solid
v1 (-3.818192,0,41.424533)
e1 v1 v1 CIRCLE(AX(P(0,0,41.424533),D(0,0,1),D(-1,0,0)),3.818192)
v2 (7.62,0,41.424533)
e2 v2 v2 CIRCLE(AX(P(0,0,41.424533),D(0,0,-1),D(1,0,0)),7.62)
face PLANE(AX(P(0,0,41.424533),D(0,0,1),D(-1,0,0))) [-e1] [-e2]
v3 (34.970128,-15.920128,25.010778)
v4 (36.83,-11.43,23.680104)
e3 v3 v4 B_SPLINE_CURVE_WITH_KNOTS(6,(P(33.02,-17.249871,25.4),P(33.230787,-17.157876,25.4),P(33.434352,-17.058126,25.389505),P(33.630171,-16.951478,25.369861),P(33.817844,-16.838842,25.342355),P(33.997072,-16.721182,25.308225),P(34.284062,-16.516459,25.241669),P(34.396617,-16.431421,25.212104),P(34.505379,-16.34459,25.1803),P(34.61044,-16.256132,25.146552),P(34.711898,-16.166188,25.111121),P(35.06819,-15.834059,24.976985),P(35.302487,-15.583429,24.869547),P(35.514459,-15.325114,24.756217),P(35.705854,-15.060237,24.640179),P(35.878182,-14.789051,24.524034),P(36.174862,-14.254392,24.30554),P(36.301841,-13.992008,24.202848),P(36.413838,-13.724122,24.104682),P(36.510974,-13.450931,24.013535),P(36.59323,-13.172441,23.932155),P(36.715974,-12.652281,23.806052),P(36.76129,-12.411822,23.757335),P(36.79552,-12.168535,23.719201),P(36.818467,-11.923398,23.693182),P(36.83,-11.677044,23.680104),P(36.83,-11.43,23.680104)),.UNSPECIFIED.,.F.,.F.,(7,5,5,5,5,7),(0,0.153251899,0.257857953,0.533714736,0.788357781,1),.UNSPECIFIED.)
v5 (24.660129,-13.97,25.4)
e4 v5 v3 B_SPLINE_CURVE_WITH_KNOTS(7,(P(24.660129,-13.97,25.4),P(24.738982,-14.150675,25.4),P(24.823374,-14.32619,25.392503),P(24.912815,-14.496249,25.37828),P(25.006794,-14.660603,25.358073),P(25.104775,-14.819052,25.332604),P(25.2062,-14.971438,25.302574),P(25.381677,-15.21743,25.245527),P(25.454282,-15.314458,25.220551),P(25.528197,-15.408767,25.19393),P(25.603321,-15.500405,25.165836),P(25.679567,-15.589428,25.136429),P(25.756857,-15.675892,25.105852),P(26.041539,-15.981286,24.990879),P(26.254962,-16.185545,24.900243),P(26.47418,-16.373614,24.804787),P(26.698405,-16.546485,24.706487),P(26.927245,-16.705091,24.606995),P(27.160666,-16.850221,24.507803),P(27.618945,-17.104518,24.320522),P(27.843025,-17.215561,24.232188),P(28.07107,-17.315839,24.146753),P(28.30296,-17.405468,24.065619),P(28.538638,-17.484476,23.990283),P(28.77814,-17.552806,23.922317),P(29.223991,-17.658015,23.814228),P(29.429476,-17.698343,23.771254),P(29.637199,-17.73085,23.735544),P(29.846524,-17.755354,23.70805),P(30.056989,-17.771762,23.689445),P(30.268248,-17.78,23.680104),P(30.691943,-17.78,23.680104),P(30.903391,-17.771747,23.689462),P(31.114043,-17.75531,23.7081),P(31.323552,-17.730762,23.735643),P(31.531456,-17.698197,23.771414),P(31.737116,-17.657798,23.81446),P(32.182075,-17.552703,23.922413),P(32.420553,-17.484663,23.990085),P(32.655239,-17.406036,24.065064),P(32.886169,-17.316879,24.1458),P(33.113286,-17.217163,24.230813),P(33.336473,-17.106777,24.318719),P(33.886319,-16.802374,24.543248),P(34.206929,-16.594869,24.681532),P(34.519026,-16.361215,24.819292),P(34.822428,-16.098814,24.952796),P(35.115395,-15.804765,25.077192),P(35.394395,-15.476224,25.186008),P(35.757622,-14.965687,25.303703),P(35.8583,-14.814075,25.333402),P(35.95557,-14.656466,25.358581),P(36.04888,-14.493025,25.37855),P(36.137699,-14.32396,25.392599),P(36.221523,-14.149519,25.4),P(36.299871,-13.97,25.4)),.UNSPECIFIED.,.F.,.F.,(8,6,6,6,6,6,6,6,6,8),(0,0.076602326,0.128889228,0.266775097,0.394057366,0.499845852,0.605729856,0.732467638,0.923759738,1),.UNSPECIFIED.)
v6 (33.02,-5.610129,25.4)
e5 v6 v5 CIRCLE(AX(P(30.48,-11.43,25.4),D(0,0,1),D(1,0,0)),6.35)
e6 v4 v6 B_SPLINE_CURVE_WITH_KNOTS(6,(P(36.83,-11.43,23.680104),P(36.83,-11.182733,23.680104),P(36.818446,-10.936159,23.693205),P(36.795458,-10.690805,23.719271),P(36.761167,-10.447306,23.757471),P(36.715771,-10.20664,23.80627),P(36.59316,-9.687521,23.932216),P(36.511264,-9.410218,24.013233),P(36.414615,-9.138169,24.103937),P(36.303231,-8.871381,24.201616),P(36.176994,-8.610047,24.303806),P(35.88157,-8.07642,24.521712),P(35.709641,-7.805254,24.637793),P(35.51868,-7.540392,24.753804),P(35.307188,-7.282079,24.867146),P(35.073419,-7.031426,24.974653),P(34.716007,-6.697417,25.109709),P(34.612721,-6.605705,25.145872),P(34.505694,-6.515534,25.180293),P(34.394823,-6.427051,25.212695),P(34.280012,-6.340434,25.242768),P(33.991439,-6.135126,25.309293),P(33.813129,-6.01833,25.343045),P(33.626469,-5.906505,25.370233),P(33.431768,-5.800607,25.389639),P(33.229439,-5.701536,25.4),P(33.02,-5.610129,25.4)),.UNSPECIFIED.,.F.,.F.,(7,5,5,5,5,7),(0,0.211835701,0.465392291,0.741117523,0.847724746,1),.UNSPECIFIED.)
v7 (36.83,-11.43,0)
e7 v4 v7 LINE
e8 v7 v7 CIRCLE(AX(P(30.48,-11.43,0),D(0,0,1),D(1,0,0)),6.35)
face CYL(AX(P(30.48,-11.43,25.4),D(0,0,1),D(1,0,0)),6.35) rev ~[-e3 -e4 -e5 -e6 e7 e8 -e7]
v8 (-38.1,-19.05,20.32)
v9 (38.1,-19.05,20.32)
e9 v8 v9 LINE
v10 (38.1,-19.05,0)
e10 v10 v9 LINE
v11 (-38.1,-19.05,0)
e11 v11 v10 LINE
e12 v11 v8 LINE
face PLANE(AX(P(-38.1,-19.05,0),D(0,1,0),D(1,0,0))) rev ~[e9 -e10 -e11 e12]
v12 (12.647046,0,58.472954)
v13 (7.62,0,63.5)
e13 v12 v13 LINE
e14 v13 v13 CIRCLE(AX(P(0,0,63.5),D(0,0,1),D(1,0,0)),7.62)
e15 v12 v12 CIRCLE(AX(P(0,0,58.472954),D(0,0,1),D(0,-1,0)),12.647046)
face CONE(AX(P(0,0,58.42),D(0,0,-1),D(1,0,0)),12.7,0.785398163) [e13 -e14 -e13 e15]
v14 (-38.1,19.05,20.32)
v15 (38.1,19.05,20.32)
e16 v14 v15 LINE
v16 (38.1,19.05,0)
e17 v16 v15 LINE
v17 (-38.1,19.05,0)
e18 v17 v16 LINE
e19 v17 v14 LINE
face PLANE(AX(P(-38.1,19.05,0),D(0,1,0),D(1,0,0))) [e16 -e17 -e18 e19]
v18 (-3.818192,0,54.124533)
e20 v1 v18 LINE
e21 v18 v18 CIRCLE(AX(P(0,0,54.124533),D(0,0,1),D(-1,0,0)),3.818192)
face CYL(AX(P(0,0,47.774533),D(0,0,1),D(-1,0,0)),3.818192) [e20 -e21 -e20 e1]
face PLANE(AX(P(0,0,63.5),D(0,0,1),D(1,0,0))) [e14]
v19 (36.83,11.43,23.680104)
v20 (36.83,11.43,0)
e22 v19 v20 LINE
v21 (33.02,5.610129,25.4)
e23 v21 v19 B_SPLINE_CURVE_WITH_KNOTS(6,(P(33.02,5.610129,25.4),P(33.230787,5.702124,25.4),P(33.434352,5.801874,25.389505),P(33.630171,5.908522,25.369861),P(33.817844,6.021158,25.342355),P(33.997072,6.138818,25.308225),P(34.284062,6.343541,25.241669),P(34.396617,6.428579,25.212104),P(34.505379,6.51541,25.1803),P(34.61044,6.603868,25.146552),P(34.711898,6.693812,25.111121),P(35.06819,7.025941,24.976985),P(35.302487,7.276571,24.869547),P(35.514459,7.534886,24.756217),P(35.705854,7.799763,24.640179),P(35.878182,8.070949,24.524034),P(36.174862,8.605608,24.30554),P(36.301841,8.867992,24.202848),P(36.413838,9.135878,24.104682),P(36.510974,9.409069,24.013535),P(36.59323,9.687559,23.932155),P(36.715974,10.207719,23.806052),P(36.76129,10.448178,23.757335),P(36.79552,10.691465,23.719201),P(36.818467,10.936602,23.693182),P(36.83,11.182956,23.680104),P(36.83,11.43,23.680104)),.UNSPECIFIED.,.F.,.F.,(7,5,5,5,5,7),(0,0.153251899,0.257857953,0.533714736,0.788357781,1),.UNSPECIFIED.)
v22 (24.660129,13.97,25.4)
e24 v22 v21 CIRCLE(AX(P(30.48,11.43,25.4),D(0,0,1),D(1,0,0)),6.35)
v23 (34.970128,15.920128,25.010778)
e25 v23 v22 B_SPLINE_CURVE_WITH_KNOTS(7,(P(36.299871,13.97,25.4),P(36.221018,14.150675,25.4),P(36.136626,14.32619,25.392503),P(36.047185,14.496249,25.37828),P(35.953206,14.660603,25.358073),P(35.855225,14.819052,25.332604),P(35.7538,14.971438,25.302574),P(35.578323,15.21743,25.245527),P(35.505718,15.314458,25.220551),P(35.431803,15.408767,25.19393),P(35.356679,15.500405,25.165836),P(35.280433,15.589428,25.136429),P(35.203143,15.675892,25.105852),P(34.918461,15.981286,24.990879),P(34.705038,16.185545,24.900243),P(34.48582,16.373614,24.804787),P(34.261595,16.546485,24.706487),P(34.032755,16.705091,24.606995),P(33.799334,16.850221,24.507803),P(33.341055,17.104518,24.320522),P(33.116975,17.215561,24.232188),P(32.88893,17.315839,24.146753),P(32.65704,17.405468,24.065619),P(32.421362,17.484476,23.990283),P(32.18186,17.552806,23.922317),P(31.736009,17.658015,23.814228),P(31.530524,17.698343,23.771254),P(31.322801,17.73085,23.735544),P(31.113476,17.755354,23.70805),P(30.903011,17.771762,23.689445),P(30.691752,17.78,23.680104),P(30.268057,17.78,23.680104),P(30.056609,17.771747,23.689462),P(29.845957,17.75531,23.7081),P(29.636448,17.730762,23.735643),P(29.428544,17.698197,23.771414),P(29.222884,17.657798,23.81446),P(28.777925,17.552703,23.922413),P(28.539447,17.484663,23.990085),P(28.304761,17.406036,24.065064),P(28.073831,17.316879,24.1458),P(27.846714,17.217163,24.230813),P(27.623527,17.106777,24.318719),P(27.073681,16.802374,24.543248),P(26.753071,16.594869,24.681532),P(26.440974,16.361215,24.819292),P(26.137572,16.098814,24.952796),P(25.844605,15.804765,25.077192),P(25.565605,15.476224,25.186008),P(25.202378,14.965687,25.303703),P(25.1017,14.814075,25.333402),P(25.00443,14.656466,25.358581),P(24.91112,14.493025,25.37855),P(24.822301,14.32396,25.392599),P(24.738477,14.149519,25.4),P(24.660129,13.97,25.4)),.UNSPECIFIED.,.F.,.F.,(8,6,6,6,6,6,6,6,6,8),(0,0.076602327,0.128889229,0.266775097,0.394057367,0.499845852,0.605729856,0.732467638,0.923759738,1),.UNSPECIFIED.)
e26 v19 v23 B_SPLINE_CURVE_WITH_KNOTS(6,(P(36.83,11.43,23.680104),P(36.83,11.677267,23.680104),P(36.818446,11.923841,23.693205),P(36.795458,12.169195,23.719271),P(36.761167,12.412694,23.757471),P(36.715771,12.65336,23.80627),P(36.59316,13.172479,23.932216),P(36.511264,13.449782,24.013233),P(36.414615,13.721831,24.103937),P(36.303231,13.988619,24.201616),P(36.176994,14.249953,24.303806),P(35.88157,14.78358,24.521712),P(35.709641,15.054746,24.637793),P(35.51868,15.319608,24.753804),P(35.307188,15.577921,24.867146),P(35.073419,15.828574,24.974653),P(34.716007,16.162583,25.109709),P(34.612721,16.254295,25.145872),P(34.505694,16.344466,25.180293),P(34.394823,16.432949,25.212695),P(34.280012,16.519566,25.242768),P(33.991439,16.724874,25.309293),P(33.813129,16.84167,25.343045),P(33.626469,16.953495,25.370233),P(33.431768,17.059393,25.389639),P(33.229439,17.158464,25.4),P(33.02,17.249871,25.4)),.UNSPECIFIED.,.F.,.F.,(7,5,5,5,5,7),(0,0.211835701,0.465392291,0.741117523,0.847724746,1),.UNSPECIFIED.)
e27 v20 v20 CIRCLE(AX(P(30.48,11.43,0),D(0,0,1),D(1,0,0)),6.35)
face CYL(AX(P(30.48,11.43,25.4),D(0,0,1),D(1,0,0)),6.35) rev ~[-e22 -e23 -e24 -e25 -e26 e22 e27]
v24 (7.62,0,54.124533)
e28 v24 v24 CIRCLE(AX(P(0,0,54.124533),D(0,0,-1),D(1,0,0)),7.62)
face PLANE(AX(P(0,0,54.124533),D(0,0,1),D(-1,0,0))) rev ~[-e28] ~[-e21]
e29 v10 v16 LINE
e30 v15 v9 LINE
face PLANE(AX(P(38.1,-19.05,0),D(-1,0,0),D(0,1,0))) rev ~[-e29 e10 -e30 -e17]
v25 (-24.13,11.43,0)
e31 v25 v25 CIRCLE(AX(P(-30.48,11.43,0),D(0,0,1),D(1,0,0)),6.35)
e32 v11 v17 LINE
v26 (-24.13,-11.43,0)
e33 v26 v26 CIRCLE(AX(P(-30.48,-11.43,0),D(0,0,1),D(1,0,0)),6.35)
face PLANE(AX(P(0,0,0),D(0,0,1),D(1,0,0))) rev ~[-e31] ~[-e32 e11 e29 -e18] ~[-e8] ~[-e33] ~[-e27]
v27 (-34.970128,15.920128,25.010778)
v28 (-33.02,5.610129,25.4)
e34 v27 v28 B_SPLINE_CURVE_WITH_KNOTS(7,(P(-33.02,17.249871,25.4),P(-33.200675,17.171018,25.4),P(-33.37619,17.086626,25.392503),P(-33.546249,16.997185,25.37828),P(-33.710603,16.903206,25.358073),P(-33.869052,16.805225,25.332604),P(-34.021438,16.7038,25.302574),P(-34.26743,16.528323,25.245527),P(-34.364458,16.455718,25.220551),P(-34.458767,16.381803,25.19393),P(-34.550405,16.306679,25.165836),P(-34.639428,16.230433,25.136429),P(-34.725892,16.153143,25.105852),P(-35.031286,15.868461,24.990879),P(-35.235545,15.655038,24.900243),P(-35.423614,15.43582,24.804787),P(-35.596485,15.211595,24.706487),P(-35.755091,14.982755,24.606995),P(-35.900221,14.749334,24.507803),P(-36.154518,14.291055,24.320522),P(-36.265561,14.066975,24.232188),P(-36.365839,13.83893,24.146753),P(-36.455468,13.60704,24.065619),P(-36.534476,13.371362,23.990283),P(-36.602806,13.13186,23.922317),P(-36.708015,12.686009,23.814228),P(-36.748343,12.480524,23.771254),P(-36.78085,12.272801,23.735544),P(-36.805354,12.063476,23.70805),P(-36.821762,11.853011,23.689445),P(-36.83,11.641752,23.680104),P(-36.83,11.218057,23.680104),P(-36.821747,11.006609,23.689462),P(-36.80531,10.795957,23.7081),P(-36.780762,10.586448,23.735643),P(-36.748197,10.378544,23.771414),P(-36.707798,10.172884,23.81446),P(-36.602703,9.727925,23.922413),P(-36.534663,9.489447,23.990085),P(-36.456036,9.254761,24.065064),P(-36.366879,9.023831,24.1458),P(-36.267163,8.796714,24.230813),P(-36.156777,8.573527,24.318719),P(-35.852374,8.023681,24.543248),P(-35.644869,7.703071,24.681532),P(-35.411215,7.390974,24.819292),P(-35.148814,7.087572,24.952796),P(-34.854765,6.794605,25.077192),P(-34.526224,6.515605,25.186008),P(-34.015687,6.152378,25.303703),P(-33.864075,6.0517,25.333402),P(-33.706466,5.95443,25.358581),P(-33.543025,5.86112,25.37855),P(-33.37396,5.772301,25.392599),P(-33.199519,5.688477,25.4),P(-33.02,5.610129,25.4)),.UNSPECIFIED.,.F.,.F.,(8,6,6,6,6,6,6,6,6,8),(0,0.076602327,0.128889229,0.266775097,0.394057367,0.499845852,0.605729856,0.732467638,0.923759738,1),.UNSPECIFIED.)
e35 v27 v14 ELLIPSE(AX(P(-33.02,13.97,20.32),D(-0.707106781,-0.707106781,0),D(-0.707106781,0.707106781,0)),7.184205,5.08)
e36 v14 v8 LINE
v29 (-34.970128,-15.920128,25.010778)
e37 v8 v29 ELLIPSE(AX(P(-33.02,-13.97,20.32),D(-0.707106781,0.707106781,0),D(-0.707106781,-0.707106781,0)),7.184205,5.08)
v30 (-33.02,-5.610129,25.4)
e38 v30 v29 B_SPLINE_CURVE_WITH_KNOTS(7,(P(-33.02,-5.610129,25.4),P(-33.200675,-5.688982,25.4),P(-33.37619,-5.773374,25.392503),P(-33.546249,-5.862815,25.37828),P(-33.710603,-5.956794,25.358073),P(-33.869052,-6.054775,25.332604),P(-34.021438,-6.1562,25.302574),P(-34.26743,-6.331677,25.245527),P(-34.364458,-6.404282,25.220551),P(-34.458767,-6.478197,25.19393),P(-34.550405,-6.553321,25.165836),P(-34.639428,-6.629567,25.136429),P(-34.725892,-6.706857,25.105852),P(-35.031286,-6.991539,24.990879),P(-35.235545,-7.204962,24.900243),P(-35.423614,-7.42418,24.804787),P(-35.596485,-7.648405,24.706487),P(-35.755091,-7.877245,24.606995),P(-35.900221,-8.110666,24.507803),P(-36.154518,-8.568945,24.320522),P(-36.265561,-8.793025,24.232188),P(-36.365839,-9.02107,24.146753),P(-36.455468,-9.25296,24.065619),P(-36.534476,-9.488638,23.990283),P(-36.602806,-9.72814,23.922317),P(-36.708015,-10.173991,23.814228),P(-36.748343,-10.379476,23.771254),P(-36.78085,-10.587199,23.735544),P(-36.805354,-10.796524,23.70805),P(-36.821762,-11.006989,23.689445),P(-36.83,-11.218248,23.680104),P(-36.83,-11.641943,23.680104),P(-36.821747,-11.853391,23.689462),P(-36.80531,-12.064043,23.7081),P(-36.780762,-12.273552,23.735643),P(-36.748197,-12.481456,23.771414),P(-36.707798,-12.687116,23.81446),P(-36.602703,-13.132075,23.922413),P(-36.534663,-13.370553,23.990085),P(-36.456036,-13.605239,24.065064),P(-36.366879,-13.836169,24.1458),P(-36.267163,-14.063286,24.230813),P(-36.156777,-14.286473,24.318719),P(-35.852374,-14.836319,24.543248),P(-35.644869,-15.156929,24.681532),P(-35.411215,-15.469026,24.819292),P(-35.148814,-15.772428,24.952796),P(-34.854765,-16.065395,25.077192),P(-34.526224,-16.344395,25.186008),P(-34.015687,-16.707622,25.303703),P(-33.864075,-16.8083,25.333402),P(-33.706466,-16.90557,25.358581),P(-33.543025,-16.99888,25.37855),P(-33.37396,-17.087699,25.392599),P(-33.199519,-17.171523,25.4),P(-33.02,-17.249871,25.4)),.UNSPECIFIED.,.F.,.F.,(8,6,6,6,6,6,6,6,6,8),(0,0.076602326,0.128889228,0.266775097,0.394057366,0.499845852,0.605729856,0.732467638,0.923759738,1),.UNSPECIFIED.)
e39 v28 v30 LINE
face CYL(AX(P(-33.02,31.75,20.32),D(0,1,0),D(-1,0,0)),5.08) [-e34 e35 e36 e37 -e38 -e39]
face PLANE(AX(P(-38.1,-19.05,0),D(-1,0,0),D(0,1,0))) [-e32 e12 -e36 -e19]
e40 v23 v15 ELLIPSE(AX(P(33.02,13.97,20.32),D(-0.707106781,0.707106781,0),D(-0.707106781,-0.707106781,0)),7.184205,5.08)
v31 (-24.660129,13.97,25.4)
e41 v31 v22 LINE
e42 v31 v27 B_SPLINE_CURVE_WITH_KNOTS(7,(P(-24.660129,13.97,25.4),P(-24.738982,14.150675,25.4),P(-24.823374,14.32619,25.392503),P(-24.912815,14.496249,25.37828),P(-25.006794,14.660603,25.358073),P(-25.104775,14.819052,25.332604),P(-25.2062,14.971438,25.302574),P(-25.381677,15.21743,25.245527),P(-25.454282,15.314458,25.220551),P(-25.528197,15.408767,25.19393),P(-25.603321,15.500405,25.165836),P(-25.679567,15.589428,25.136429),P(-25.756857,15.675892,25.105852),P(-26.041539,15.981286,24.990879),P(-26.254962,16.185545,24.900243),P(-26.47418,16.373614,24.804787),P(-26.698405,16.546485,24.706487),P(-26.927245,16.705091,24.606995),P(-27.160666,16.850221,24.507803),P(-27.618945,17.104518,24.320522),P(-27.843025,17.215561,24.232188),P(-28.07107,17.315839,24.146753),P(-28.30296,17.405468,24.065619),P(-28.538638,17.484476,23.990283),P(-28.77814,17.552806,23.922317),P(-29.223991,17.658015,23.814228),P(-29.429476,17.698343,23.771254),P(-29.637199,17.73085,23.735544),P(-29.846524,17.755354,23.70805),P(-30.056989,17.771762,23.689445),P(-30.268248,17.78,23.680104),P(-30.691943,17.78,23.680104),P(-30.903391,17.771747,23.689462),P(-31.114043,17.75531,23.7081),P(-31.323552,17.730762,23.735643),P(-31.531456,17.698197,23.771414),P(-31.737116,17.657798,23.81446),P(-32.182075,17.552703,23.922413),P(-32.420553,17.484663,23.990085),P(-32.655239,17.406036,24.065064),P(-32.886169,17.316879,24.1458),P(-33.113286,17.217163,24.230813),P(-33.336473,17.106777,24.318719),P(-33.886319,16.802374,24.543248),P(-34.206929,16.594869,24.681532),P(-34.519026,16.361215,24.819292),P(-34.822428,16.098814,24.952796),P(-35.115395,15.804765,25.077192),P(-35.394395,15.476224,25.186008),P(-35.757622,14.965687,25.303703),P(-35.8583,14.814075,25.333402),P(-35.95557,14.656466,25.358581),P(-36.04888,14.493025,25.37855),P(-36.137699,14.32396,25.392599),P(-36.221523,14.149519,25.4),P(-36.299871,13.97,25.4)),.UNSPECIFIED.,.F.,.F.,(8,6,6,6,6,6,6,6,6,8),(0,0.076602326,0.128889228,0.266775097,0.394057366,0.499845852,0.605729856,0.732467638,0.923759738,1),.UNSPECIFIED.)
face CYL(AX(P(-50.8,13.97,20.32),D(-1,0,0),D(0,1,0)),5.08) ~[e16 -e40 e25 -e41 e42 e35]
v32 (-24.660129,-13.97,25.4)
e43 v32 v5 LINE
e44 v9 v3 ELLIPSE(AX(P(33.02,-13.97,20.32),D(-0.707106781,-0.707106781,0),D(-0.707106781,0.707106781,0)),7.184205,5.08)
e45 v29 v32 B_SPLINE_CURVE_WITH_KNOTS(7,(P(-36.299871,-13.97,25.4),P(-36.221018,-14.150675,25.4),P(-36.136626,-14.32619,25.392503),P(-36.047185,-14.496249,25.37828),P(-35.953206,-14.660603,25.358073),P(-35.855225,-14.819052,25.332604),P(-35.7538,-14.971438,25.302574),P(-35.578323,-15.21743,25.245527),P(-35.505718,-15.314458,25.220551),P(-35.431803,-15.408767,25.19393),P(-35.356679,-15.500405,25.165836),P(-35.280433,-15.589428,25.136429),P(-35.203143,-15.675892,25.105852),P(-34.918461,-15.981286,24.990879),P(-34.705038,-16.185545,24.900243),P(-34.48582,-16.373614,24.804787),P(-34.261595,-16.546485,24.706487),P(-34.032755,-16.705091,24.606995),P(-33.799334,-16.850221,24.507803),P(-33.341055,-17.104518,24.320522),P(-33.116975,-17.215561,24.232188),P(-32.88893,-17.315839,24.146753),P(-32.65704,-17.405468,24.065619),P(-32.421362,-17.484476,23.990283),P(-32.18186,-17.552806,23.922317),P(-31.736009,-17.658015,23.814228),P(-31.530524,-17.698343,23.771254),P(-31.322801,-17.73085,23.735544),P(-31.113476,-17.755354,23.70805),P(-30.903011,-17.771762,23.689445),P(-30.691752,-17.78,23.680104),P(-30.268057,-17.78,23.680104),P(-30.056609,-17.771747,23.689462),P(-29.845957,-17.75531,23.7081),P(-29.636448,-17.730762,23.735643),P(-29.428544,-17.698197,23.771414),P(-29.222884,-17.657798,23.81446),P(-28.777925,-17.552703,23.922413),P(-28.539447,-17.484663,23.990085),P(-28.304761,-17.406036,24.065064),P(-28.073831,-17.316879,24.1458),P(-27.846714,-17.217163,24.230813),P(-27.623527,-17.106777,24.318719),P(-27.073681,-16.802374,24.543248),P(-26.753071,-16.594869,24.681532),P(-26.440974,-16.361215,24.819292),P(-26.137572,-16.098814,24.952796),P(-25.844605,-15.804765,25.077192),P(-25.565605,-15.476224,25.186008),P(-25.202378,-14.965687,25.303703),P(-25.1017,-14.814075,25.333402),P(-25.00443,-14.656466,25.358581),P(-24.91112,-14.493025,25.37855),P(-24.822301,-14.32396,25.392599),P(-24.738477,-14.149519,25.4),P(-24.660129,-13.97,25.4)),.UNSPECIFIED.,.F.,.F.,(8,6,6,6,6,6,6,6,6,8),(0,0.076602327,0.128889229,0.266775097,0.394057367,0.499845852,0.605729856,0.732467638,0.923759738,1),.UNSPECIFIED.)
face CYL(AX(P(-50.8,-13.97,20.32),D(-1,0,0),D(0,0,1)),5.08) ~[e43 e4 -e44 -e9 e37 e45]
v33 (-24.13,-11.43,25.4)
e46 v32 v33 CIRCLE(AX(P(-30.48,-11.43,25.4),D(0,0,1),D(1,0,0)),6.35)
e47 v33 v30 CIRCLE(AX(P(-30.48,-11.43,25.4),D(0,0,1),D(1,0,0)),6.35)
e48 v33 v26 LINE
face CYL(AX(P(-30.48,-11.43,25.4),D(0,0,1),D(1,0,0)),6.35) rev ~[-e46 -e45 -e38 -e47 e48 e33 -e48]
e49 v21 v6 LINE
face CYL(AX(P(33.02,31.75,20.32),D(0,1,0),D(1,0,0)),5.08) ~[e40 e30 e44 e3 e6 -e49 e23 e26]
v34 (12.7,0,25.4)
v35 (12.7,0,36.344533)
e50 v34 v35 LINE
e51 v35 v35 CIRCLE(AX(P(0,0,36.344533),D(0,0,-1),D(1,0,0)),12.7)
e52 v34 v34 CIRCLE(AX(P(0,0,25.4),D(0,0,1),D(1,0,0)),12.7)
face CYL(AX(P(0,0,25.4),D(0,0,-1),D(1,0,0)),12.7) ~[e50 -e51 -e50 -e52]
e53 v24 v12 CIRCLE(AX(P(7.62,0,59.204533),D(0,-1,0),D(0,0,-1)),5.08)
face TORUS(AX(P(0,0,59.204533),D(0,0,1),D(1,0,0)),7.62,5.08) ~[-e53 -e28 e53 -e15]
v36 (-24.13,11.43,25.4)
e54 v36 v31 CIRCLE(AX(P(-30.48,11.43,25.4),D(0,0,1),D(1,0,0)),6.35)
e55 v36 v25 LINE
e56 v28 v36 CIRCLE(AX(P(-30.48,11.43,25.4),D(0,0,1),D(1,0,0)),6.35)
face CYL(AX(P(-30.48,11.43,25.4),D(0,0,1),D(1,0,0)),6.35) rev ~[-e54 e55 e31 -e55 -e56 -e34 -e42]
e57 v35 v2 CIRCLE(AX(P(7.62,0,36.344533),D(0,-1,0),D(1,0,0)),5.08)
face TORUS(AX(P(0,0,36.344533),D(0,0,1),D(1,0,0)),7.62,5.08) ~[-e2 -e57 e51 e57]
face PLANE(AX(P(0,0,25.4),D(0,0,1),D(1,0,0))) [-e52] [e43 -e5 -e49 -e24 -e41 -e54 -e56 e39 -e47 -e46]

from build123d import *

# Parameters (mm, degrees)
F0_W        = 76.2
F0_H        = 38.1
F1_DEPTH    = 25.4
F2_R        = 6.35
F3_DEPTH    = 25.4
F4_R        = 12.7
F5_DEPTH    = 38.1
F6_W        = 12.7
F6_H        = 12.7
F8_T1_DEPTH = 101.6
F8_T3_DEPTH = 63.5


# Not quite as in the source:
# - a fillet or chamfer that OpenCascade refuses, or shapes differently, is made with other operations: its cross-section is extruded or revolved along the edge and cut away or added


with BuildPart() as f1:
    # F0 (on Top) → F1 (new body)
    with BuildSketch(Plane.XY):
        Rectangle(F0_W, F0_H)
    extrude(amount=F1_DEPTH)

    # F2 (on face) → F3 (cut)
    with BuildSketch(Plane.XY.offset(25.4)):
        with Locations((-30.48, 11.43)):
            Circle(F2_R)
        with Locations((-30.48, -11.43)):
            Circle(F2_R)
        with Locations((30.48, 11.43)):
            Circle(F2_R)
        with Locations((30.48, -11.43)):
            Circle(F2_R)
    extrude(amount=-F3_DEPTH, mode=Mode.SUBTRACT)

    # F4 (on face) → F5 (join)
    with BuildSketch(Plane.XY.offset(25.4)):
        Circle(F4_R)
    extrude(amount=F5_DEPTH)

    # F6 (on Front) → F7 (revolve, cut)
    with BuildSketch(Plane.XZ):
        with Locations((-10.1681923658, 47.7745333523)):
            Rectangle(F6_W, F6_H)
    revolve(axis=Axis((0, 0, 63.5), (0, 0, 1)), mode=Mode.SUBTRACT)

    # F8: fillet of radius 5.08 on 6 edges, made by hand

    # F8_s2 → F8_t1 (cut)
    with BuildSketch(Plane.YZ.offset(-50.8)):
        with BuildLine():
            ThreePointArc((-13.97, 25.4), (-17.5621024484, 23.9121024484), (-19.05, 20.32))
            Line((-19.05, 20.32), (-19.05, 25.4))
            Line((-19.05, 25.4), (-13.97, 25.4))
        make_face()
        with BuildLine():
            ThreePointArc((19.05, 20.32), (17.5621024484, 23.9121024484), (13.97, 25.4))
            Line((13.97, 25.4), (19.05, 25.4))
            Line((19.05, 25.4), (19.05, 20.32))
        make_face()
    extrude(amount=F8_T1_DEPTH, mode=Mode.SUBTRACT)

    # F8_s4 → F8_t3 (cut)
    with BuildSketch(Plane.XZ.offset(-31.75)):
        with BuildLine():
            ThreePointArc((-38.1, 20.32), (-36.6121024484, 23.9121024484), (-33.02, 25.4))
            Line((-33.02, 25.4), (-38.1, 25.4))
            Line((-38.1, 25.4), (-38.1, 20.32))
        make_face()
        with BuildLine():
            ThreePointArc((38.1, 20.32), (36.6121024484, 23.9121024484), (33.02, 25.4))
            Line((33.02, 25.4), (38.1, 25.4))
            Line((38.1, 25.4), (38.1, 20.32))
        make_face()
    extrude(amount=F8_T3_DEPTH, mode=Mode.SUBTRACT)

    # F8_s5 → F8_t6 (revolve, cut)
    with BuildSketch(Plane.XZ):
        with BuildLine():
            ThreePointArc((12.7, 36.3445333523), (11.2121024484, 39.9366358007), (7.62, 41.4245333523))
            Line((7.62, 41.4245333523), (12.7, 41.4245333523))
            Line((12.7, 41.4245333523), (12.7, 36.3445333523))
        make_face()
    revolve(axis=Axis((0, 0, 41.4245333523), (0, 0, -1)), mode=Mode.SUBTRACT)

    # F8_s7 → F8_t8 (revolve, cut)
    with BuildSketch(Plane.XZ):
        with BuildLine():
            ThreePointArc((7.62, 54.1245333523), (11.2121024484, 55.6124309038), (12.7, 59.2045333523))
            Line((12.7, 59.2045333523), (12.7, 54.1245333523))
            Line((12.7, 54.1245333523), (7.62, 54.1245333523))
        make_face()
    revolve(axis=Axis((0, 0, 54.1245333523), (0, 0, -1)), mode=Mode.SUBTRACT)

    # F9: chamfer of 5.08 on 1 edges, made by hand

    # F9_s1 → F9_t2 (revolve, cut)
    with BuildSketch(Plane.XZ):
        Polygon((12.7, 58.42), (7.62, 63.5), (12.7, 63.5), align=None)
    revolve(axis=Axis((0, 0, 63.5), (0, 0, 1)), mode=Mode.SUBTRACT)


solid = f1.part
